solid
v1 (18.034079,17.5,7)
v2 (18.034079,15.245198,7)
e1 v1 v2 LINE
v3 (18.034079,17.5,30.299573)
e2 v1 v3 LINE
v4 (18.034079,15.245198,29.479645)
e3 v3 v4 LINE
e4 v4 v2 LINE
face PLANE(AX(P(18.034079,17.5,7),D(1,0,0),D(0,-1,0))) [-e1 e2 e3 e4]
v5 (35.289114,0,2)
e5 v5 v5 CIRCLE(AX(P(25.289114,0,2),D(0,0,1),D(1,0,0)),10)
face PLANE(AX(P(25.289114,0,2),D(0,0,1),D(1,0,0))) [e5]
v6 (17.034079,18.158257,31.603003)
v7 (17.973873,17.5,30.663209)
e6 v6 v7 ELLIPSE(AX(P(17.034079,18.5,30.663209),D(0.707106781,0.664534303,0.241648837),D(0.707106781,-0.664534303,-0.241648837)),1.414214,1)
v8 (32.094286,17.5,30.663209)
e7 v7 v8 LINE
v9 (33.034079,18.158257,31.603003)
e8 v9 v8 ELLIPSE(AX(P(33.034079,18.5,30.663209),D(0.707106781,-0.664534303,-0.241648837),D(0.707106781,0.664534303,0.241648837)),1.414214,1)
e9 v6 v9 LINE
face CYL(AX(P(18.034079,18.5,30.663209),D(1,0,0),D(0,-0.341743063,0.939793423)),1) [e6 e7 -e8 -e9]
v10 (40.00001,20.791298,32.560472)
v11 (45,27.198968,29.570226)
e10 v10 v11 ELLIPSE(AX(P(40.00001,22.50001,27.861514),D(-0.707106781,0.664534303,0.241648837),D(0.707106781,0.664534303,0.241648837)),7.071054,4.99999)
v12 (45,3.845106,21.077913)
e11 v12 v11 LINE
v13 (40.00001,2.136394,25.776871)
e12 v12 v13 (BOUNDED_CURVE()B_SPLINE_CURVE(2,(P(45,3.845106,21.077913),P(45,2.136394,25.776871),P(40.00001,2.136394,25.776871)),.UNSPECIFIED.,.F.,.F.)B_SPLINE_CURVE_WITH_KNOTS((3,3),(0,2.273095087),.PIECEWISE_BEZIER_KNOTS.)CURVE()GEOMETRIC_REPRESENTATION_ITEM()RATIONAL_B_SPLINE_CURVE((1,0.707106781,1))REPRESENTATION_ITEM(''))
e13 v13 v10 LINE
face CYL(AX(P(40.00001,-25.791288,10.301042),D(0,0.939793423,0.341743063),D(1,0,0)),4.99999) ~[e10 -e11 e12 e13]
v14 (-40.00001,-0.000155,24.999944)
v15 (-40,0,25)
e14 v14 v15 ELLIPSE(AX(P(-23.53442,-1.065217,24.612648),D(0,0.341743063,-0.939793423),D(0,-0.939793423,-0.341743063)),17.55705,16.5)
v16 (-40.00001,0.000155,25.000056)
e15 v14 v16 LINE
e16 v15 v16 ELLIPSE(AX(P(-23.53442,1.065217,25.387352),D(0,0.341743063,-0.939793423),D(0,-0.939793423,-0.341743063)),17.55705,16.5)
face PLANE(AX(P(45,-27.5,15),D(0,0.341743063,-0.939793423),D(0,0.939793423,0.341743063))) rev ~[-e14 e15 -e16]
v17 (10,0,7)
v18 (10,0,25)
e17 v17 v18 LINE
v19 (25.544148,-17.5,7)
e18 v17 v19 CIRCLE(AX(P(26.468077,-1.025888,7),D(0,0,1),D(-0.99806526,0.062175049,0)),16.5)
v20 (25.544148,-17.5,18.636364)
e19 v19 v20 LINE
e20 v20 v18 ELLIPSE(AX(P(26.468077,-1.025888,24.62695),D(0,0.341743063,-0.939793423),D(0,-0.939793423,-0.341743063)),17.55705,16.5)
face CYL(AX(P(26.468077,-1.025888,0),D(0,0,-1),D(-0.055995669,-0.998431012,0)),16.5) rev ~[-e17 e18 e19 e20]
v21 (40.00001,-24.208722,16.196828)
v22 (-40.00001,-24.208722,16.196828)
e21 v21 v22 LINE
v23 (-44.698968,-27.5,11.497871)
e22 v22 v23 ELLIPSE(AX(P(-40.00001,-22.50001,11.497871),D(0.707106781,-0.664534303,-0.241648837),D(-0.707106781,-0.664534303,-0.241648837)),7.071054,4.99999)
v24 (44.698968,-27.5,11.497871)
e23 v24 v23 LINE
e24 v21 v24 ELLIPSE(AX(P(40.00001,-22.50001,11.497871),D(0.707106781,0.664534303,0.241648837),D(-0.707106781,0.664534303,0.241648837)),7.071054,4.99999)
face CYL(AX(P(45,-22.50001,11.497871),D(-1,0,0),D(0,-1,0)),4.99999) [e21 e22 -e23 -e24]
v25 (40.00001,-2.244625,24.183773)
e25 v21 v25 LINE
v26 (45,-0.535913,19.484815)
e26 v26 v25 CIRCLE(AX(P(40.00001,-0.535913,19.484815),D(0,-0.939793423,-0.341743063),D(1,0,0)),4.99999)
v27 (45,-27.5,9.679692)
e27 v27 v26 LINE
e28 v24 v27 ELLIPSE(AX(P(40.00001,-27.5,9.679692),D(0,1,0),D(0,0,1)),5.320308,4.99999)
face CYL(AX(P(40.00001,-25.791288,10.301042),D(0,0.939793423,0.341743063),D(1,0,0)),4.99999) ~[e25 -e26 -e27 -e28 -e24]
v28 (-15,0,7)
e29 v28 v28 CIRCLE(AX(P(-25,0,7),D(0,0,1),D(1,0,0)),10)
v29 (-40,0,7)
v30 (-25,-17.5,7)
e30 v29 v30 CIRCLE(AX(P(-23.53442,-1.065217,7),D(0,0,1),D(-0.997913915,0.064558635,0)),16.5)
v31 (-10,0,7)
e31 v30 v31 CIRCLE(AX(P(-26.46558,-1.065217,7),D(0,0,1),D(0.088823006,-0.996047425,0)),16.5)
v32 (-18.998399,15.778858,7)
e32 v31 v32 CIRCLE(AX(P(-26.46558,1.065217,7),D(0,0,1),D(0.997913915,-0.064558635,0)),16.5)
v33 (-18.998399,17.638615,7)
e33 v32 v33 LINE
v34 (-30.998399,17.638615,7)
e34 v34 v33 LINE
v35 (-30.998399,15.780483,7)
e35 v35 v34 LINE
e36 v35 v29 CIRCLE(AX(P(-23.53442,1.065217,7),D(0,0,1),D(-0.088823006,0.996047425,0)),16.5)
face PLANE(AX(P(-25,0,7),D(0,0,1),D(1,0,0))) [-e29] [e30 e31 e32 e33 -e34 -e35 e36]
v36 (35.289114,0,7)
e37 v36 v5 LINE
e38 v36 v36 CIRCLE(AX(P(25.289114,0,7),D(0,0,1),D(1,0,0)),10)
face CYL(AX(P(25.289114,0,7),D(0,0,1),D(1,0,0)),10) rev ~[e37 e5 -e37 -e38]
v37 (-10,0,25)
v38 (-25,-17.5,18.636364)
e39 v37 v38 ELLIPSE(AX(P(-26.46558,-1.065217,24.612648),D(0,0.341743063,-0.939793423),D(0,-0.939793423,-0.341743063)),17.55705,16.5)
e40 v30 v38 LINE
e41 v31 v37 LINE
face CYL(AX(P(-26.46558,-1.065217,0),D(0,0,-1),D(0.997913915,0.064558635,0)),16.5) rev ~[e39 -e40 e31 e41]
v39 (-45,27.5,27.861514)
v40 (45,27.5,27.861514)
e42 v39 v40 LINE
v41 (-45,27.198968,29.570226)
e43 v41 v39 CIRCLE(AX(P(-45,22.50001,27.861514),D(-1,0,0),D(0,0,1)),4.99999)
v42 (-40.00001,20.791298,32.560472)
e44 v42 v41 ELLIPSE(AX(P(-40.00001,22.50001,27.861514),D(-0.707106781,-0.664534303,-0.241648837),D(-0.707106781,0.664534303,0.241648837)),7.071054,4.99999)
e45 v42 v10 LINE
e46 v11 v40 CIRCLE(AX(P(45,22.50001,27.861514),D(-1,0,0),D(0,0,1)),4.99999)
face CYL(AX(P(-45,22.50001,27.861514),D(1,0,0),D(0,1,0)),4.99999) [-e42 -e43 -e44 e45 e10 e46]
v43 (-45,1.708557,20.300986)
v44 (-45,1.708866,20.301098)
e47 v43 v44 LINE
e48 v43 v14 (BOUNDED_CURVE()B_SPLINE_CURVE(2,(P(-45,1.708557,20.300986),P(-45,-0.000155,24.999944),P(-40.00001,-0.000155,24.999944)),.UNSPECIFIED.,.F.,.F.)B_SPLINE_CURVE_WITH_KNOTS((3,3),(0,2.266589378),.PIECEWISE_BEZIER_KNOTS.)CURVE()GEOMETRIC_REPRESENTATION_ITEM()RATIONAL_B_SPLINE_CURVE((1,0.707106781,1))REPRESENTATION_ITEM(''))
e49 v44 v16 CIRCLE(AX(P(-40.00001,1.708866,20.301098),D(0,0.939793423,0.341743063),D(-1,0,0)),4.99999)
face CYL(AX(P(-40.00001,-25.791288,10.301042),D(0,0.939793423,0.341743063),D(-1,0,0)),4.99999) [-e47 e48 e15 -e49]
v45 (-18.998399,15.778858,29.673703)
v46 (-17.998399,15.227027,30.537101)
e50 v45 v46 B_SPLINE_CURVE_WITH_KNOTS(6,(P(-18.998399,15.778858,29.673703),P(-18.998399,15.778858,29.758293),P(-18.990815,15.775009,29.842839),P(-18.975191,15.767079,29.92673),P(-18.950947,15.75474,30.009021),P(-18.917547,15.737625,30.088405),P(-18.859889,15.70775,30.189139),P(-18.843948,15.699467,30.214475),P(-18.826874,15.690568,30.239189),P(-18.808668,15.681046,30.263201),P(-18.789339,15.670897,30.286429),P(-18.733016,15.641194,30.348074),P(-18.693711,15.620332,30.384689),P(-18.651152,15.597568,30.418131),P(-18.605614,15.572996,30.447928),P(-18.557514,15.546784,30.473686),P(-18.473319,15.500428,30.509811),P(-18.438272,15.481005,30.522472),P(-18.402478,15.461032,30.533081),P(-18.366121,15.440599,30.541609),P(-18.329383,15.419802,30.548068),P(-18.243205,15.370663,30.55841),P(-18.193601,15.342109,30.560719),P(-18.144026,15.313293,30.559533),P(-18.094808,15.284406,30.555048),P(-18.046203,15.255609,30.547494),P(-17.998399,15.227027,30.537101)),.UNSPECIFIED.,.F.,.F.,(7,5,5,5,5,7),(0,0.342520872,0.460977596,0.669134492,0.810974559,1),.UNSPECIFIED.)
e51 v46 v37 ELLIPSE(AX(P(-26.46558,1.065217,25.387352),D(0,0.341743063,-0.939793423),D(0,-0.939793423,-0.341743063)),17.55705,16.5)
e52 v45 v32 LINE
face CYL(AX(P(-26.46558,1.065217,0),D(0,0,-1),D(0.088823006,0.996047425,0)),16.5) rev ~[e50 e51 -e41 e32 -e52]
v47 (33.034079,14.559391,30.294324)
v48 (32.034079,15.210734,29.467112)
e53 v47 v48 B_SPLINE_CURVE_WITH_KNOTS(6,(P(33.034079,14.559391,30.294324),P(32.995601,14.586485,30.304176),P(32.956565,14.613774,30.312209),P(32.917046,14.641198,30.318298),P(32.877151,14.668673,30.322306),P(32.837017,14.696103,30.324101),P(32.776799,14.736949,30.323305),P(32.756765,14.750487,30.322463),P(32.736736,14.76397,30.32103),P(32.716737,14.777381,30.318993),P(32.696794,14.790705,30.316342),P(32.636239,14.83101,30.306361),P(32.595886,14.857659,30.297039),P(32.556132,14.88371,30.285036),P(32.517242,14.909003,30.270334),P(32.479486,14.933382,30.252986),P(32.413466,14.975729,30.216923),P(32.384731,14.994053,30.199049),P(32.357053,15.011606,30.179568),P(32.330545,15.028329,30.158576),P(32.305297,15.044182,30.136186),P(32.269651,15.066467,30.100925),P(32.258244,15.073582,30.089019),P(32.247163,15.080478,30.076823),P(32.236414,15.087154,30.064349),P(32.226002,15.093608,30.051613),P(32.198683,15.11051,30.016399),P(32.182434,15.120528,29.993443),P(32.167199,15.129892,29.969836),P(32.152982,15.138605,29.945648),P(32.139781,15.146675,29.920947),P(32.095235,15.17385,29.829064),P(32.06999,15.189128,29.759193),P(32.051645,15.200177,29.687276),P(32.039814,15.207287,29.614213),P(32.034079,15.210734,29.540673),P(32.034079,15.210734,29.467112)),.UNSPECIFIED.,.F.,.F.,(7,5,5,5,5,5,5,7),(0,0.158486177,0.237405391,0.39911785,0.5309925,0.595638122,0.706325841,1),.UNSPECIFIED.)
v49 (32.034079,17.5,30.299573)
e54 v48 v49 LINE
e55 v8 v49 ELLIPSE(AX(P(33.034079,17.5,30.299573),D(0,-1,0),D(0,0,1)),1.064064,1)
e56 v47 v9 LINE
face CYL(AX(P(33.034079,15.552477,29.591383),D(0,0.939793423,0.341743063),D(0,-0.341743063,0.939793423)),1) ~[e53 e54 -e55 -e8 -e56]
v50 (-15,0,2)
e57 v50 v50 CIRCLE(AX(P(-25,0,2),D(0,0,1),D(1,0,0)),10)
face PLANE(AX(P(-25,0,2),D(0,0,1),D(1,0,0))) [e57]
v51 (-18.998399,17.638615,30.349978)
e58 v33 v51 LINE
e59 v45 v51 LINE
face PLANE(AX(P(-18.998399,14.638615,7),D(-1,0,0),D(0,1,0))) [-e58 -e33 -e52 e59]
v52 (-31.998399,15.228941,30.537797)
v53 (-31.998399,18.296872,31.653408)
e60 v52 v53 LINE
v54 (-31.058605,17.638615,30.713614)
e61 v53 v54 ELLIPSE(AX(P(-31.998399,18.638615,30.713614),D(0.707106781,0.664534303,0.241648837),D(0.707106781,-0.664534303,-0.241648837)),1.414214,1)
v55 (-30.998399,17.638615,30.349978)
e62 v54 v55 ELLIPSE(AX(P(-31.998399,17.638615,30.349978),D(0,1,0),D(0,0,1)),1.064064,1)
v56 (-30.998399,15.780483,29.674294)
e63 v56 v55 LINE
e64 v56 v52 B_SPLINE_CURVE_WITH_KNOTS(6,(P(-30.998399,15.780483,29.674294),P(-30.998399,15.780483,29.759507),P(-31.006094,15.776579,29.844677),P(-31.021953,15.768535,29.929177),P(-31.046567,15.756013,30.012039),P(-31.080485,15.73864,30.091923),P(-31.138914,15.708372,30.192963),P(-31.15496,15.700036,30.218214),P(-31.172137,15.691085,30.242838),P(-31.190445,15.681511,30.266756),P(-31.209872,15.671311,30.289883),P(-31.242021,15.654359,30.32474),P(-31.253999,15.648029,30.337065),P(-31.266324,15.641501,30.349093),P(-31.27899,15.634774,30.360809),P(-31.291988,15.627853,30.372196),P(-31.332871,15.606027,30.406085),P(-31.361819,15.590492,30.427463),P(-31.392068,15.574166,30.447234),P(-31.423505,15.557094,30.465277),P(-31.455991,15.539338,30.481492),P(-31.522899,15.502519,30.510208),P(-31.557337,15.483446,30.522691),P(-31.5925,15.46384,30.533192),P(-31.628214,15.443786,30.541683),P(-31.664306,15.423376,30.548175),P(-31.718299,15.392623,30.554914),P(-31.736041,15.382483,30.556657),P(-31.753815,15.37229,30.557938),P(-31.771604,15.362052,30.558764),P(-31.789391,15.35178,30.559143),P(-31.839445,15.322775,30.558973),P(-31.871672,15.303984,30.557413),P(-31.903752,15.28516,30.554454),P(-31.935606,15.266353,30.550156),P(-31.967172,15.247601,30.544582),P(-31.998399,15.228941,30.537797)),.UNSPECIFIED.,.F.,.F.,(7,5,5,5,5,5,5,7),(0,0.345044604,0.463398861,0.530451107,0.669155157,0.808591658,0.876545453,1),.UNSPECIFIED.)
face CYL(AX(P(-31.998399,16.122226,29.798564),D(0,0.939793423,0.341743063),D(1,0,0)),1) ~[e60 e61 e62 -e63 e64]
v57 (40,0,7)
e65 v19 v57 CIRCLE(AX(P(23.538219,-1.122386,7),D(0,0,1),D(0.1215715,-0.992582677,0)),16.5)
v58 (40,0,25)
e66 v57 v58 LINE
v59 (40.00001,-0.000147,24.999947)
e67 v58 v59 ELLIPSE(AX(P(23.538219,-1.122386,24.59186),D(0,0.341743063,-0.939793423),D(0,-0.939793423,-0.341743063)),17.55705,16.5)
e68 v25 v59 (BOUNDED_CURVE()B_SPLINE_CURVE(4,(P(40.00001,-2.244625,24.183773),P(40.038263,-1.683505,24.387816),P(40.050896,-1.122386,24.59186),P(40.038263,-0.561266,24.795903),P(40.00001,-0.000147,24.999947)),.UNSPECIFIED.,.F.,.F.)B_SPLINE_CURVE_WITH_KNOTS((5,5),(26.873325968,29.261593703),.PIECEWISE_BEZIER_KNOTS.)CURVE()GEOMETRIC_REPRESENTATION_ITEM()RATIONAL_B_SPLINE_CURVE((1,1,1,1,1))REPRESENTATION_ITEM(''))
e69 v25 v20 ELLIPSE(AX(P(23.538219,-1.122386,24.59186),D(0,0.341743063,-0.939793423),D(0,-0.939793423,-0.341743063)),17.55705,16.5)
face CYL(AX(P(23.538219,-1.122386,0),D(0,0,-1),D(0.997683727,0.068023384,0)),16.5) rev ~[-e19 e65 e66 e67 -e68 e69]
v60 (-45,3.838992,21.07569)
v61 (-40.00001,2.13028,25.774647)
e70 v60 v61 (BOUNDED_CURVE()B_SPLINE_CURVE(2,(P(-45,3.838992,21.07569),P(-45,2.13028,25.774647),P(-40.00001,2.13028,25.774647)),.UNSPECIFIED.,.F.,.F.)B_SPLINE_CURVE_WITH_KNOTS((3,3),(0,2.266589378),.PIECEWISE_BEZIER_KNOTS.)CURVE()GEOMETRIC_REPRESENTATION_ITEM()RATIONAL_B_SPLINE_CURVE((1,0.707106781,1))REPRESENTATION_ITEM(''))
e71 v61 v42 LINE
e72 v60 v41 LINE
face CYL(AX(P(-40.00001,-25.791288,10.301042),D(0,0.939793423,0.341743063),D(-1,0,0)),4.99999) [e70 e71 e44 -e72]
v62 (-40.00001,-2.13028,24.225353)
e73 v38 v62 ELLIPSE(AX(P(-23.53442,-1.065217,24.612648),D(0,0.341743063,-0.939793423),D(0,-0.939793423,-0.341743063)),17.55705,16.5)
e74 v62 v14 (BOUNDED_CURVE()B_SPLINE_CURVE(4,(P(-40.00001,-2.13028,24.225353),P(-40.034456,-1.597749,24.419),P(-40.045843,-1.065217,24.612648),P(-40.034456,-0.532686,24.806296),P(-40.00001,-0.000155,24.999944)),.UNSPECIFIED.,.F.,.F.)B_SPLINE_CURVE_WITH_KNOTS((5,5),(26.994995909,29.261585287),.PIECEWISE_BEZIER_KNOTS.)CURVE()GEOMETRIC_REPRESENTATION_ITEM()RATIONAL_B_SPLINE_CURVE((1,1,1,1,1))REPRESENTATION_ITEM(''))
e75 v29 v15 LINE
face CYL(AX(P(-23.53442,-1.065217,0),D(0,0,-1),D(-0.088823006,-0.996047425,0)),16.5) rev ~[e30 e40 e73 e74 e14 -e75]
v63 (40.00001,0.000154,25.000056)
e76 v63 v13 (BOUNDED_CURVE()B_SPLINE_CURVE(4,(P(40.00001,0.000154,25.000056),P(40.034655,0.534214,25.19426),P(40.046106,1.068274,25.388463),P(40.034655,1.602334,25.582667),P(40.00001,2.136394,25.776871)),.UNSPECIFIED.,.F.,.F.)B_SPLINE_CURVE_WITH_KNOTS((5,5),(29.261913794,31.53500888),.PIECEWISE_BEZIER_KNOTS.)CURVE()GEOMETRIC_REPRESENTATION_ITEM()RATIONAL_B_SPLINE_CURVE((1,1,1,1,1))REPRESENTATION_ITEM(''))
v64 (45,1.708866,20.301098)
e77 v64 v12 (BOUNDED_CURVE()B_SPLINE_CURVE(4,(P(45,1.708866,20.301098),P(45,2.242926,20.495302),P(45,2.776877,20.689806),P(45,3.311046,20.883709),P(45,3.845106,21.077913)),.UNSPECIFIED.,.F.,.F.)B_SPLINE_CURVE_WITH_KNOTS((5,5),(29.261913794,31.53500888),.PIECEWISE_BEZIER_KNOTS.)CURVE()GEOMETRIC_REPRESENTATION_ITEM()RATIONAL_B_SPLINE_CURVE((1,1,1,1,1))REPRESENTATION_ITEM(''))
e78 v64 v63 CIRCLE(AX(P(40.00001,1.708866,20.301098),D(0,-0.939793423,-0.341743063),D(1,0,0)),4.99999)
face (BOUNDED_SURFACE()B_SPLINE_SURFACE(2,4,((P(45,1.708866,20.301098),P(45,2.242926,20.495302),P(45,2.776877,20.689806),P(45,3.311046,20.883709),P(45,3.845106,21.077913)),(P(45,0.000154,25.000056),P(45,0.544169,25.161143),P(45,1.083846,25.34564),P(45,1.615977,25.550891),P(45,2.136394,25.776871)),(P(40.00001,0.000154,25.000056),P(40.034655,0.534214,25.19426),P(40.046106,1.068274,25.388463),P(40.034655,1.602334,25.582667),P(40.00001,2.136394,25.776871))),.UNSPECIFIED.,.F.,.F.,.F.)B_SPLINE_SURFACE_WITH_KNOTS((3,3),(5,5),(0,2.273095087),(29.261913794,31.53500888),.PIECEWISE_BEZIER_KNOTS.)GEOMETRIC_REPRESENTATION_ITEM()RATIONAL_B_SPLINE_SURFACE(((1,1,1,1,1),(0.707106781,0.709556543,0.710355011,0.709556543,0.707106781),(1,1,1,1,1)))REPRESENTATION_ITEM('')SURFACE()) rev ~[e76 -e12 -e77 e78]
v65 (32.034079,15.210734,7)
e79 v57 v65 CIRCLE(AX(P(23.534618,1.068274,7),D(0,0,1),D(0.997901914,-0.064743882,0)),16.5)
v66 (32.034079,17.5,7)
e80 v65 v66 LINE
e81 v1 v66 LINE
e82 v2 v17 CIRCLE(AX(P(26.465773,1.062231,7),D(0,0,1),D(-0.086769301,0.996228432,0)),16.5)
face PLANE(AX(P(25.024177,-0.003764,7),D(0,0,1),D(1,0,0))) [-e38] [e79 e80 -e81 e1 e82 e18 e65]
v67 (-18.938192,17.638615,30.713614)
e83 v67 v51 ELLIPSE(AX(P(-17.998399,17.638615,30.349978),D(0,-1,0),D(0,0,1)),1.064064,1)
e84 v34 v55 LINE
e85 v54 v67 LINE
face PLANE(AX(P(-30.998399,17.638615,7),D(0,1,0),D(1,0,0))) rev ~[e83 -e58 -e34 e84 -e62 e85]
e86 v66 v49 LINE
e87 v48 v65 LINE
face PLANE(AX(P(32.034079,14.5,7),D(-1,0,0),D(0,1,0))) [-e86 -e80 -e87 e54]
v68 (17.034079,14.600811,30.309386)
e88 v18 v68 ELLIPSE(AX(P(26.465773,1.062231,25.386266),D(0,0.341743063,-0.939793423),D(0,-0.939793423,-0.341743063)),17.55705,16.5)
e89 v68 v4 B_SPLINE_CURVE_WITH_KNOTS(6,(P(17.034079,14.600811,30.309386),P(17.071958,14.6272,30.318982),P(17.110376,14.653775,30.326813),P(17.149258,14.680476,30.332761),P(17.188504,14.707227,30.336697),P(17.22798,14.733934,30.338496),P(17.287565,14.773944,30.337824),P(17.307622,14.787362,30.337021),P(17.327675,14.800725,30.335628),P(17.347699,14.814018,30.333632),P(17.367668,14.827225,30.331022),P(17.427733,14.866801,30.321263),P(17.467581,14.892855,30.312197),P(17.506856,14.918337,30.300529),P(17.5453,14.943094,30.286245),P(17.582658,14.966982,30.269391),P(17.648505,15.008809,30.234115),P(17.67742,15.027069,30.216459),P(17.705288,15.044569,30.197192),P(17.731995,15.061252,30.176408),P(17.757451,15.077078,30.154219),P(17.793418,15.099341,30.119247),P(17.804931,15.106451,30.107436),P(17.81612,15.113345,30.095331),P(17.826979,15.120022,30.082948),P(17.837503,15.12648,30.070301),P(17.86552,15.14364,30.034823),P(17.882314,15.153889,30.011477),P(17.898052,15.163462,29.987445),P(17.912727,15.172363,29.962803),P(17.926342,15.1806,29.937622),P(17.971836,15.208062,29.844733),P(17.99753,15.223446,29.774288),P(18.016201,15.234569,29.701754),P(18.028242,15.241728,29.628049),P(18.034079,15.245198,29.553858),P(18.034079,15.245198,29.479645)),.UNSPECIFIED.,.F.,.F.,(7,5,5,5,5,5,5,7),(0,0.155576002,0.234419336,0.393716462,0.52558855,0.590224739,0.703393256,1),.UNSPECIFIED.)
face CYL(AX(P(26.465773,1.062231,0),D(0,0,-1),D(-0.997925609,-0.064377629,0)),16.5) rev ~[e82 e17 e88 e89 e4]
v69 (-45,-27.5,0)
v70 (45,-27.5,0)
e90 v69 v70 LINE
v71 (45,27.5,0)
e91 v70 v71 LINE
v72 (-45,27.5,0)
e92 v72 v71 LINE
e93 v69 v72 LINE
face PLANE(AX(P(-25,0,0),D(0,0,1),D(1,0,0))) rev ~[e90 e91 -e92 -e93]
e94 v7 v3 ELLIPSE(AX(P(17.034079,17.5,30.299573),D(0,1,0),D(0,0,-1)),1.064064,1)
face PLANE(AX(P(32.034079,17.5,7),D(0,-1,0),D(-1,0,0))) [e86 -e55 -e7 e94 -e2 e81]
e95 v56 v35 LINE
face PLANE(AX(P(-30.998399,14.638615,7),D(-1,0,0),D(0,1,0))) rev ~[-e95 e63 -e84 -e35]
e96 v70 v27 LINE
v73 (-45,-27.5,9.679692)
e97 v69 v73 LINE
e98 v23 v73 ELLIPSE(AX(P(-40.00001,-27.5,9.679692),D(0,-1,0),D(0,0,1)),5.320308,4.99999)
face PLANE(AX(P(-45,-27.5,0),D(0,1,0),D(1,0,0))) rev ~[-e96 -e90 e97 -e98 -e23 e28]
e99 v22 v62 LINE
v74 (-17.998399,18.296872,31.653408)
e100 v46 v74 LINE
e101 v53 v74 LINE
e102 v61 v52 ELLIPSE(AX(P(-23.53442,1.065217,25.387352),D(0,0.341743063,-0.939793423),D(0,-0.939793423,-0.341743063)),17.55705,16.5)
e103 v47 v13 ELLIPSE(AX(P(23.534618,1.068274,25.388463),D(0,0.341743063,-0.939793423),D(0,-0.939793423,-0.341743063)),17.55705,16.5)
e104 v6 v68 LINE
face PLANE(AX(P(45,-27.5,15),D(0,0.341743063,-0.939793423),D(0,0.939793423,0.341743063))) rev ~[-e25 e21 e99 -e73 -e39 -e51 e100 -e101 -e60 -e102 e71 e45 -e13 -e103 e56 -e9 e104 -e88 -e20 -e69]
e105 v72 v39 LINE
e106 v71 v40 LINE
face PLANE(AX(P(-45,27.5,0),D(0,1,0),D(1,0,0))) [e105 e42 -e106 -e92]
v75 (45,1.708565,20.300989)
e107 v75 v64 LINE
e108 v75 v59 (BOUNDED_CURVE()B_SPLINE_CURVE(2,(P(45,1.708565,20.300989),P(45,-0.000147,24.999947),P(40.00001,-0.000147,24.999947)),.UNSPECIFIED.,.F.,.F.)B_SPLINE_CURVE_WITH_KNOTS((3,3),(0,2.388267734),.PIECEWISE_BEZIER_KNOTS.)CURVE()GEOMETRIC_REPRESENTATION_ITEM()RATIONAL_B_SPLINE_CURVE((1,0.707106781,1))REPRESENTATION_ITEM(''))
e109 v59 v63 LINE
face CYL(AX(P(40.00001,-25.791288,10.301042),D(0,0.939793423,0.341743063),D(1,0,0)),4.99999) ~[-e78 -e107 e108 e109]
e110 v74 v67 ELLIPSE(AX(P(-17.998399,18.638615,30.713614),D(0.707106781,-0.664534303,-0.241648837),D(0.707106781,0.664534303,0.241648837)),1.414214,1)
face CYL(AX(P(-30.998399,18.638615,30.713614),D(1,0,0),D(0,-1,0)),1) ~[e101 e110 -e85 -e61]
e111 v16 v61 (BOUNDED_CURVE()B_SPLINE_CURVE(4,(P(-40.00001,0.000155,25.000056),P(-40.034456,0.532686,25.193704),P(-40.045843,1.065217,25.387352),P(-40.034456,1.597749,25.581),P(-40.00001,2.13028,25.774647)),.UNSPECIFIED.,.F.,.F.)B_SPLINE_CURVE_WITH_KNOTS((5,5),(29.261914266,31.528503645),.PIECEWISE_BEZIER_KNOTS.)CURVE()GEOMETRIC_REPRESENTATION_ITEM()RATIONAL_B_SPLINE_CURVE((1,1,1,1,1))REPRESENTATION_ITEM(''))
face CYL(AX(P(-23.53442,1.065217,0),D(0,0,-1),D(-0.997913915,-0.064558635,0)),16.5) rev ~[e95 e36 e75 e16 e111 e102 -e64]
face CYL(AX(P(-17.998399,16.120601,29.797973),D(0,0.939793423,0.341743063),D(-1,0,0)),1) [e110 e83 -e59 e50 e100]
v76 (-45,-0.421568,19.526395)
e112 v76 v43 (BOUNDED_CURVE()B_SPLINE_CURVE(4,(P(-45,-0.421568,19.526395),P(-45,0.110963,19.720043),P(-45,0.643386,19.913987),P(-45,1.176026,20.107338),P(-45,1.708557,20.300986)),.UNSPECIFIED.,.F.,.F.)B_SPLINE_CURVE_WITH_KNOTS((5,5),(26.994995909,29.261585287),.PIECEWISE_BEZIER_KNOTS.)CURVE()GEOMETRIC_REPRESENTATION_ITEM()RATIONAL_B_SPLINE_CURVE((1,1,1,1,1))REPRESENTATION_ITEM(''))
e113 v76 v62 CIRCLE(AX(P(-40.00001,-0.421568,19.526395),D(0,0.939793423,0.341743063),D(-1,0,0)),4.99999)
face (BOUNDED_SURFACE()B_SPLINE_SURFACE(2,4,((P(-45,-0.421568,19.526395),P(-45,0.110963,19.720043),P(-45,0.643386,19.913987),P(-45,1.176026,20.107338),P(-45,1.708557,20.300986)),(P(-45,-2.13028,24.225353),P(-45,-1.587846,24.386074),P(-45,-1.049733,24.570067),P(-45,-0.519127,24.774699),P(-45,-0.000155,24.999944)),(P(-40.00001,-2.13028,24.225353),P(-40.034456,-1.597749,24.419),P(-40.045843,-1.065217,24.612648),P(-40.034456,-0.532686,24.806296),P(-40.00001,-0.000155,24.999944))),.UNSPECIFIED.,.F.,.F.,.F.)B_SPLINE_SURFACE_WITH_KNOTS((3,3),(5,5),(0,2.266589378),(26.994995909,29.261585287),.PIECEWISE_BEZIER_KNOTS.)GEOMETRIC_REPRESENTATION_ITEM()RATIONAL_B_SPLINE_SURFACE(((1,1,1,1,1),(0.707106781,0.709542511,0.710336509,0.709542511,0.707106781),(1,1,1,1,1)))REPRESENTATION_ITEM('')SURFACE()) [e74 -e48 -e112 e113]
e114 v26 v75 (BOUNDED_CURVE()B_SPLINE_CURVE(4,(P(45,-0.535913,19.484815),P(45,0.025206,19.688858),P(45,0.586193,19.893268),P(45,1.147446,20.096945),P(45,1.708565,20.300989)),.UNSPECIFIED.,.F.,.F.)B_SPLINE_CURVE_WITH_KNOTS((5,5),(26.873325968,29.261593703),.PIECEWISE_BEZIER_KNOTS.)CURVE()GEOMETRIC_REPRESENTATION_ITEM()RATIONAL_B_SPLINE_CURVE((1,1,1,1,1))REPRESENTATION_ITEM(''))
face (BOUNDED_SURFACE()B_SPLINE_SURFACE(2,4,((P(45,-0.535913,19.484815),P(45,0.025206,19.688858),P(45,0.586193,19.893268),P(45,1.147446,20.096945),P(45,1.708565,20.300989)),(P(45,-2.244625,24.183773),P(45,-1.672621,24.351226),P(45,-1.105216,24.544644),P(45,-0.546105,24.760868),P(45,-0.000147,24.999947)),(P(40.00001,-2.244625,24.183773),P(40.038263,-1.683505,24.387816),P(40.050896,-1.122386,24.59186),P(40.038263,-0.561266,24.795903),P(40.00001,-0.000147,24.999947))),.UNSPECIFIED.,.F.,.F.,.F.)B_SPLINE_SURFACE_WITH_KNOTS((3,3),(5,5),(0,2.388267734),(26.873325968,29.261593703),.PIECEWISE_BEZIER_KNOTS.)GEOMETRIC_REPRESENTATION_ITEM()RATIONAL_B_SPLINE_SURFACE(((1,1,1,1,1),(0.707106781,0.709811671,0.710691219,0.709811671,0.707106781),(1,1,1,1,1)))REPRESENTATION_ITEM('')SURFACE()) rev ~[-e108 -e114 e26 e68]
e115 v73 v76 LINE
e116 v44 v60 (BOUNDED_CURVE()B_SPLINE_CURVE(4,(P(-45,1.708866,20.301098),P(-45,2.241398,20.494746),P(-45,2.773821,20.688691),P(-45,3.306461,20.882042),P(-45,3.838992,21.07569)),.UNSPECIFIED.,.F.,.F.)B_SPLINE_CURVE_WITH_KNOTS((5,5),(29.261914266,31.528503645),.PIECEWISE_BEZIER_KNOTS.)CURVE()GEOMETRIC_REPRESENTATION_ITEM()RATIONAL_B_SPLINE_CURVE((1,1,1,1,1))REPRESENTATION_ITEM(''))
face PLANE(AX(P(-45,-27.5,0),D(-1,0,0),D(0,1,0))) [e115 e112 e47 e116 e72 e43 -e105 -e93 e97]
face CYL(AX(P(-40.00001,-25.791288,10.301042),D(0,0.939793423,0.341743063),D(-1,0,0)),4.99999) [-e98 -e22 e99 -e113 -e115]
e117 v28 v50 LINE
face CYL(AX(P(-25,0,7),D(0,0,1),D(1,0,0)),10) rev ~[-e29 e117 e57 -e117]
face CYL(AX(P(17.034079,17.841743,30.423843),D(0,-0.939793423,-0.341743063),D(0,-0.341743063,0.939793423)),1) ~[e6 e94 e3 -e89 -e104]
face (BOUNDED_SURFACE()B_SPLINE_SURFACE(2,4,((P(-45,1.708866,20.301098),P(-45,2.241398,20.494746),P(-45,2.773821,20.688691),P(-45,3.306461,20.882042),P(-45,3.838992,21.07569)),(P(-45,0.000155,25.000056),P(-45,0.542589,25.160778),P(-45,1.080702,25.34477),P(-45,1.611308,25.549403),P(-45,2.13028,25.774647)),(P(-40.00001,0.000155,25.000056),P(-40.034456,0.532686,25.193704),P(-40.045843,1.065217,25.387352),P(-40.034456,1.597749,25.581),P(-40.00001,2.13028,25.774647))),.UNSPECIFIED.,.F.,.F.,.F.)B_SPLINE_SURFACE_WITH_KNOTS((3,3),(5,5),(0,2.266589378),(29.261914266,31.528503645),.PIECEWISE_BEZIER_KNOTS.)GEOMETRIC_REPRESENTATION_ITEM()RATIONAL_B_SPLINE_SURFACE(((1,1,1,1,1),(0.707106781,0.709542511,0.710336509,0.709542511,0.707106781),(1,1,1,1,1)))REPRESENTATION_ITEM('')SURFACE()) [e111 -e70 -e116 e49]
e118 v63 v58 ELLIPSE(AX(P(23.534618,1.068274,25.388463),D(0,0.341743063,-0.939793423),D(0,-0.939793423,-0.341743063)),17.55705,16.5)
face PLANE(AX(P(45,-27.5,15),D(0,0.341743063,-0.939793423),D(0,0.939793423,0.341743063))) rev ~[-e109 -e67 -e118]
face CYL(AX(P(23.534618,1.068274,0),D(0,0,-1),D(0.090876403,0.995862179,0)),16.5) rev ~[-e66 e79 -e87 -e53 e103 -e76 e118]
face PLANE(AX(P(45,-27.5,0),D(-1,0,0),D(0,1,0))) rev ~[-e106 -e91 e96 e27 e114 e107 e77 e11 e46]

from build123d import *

# Parameters (mm, degrees)
F0_W     = 90
F0_H     = 55
F1_DEPTH = 35
F2_DEPTH = 7
F3_R     = 10
F4_DEPTH = 5
F6_DEPTH = 90
F7_R     = 4.99999
F8_W     = 12
F8_H     = 3
F9_DEPTH = 30.7
F10_R    = 1


# Not quite as in the source:
# - a fillet or chamfer is up to 0.001 mm smaller than in the source, because OpenCascade refuses the exact size
# - a feature names something its author has since deleted; it is built from what else it names


with BuildPart() as f1:
    # F0 (on Top) → F1 (new body)
    with BuildSketch(Plane.XY):
        Rectangle(F0_W, F0_H)
        with BuildLine():
            ThreePointArc((-40, 0), (-36.0621543344, 11.8032751438), (-25, 17.5))
            ThreePointArc((-25, 17.5), (-13.9378456656, 11.8032751438), (-10, 0))
            ThreePointArc((-10, 0), (-13.9378456656, -11.8032751438), (-25, -17.5))
            ThreePointArc((-25, -17.5), (-36.0621543344, -11.8032751438), (-40, 0))
        make_face(mode=Mode.SUBTRACT)
        with BuildLine():
            ThreePointArc((10, 0), (13.9500894873, 11.8143319509), (25.0340790777, 17.5))
            ThreePointArc((25.0340790777, 17.5), (36.0744106495, 11.7922476991), (40, 0))
            ThreePointArc((40, 0), (36.2593265414, -11.6306402206), (25.5441482581, -17.5))
            ThreePointArc((25.5441482581, -17.5), (14.1318309156, -11.9833988689), (10, 0))
        make_face(mode=Mode.SUBTRACT)
    extrude(amount=F1_DEPTH)

    # F0 (on Top) → F2 (join)
    with BuildSketch(Plane.XY):
        with BuildLine():
            ThreePointArc((-10, 0), (-13.9378456656, 11.8032751438), (-25, 17.5))
            ThreePointArc((-25, 17.5), (-36.0621543344, 11.8032751438), (-40, 0))
            ThreePointArc((-40, 0), (-36.0621543344, -11.8032751438), (-25, -17.5))
            ThreePointArc((-25, -17.5), (-13.9378456656, -11.8032751438), (-10, 0))
        make_face()
        with BuildLine():
            ThreePointArc((40, 0), (36.0744106495, 11.7922476991), (25.0340790777, 17.5))
            ThreePointArc((25.0340790777, 17.5), (13.9500894873, 11.8143319509), (10, 0))
            ThreePointArc((10, 0), (14.1318309156, -11.9833988689), (25.5441482581, -17.5))
            ThreePointArc((25.5441482581, -17.5), (36.2593265414, -11.6306402206), (40, 0))
        make_face()
    extrude(amount=F2_DEPTH)

    # F3 (on face) → F4 (cut)
    with BuildSketch(Plane.XY.offset(7)):
        with Locations((-25, 0)):
            Circle(F3_R)
        with Locations((25.2891136679, 0)):
            Circle(F3_R)
    extrude(amount=-F4_DEPTH, mode=Mode.SUBTRACT)

    # F5 (on face) → F6 (cut)
    with BuildSketch(Plane.YZ.offset(45)):
        Polygon((-27.5, 15), (27.5, 35), (-27.5, 35), align=None)
    extrude(amount=-F6_DEPTH, mode=Mode.SUBTRACT)

    # F7 (radius 5 in the source; OpenCascade refuses exactly that, so slightly less here)
    f7_edges = [f1.edges().sort_by_distance(p)[0] for p in [
        (0, 27.5, 35),
        (-45, 0, 25),
        (0, -27.5, 15),
        (45, 0, 25),
    ]]
    fillet(f7_edges, radius=F7_R)

    # F8 (on face) → F9 (cut)
    with BuildSketch(Plane.XY.offset(7)):
        with Locations((-24.9983986142, 16.138614808)):
            Rectangle(F8_W, F8_H)
        Polygon((32.0340790777, 17.5), (25.0340790777, 17.5), (18.0340790777, 17.5), (18.0340790777, 14.5), (32.0340790777, 14.5), align=None)
    extrude(amount=F9_DEPTH, mode=Mode.SUBTRACT)

    # F10
    f10_edges = [f1.edges().sort_by_distance(p)[0] for p in [
        (-24.998399, 17.638615, 31.414042),
        (-30.998399, 16.709549, 31.0762),
        (-18.998399, 16.708736, 31.075904),
        (32.034079, 16.355367, 30.947406),
        (25.034079, 17.5, 31.363636),
        (18.034079, 16.372599, 30.953672),
    ]]
    fillet(f10_edges, radius=F10_R)


solid = f1.part
